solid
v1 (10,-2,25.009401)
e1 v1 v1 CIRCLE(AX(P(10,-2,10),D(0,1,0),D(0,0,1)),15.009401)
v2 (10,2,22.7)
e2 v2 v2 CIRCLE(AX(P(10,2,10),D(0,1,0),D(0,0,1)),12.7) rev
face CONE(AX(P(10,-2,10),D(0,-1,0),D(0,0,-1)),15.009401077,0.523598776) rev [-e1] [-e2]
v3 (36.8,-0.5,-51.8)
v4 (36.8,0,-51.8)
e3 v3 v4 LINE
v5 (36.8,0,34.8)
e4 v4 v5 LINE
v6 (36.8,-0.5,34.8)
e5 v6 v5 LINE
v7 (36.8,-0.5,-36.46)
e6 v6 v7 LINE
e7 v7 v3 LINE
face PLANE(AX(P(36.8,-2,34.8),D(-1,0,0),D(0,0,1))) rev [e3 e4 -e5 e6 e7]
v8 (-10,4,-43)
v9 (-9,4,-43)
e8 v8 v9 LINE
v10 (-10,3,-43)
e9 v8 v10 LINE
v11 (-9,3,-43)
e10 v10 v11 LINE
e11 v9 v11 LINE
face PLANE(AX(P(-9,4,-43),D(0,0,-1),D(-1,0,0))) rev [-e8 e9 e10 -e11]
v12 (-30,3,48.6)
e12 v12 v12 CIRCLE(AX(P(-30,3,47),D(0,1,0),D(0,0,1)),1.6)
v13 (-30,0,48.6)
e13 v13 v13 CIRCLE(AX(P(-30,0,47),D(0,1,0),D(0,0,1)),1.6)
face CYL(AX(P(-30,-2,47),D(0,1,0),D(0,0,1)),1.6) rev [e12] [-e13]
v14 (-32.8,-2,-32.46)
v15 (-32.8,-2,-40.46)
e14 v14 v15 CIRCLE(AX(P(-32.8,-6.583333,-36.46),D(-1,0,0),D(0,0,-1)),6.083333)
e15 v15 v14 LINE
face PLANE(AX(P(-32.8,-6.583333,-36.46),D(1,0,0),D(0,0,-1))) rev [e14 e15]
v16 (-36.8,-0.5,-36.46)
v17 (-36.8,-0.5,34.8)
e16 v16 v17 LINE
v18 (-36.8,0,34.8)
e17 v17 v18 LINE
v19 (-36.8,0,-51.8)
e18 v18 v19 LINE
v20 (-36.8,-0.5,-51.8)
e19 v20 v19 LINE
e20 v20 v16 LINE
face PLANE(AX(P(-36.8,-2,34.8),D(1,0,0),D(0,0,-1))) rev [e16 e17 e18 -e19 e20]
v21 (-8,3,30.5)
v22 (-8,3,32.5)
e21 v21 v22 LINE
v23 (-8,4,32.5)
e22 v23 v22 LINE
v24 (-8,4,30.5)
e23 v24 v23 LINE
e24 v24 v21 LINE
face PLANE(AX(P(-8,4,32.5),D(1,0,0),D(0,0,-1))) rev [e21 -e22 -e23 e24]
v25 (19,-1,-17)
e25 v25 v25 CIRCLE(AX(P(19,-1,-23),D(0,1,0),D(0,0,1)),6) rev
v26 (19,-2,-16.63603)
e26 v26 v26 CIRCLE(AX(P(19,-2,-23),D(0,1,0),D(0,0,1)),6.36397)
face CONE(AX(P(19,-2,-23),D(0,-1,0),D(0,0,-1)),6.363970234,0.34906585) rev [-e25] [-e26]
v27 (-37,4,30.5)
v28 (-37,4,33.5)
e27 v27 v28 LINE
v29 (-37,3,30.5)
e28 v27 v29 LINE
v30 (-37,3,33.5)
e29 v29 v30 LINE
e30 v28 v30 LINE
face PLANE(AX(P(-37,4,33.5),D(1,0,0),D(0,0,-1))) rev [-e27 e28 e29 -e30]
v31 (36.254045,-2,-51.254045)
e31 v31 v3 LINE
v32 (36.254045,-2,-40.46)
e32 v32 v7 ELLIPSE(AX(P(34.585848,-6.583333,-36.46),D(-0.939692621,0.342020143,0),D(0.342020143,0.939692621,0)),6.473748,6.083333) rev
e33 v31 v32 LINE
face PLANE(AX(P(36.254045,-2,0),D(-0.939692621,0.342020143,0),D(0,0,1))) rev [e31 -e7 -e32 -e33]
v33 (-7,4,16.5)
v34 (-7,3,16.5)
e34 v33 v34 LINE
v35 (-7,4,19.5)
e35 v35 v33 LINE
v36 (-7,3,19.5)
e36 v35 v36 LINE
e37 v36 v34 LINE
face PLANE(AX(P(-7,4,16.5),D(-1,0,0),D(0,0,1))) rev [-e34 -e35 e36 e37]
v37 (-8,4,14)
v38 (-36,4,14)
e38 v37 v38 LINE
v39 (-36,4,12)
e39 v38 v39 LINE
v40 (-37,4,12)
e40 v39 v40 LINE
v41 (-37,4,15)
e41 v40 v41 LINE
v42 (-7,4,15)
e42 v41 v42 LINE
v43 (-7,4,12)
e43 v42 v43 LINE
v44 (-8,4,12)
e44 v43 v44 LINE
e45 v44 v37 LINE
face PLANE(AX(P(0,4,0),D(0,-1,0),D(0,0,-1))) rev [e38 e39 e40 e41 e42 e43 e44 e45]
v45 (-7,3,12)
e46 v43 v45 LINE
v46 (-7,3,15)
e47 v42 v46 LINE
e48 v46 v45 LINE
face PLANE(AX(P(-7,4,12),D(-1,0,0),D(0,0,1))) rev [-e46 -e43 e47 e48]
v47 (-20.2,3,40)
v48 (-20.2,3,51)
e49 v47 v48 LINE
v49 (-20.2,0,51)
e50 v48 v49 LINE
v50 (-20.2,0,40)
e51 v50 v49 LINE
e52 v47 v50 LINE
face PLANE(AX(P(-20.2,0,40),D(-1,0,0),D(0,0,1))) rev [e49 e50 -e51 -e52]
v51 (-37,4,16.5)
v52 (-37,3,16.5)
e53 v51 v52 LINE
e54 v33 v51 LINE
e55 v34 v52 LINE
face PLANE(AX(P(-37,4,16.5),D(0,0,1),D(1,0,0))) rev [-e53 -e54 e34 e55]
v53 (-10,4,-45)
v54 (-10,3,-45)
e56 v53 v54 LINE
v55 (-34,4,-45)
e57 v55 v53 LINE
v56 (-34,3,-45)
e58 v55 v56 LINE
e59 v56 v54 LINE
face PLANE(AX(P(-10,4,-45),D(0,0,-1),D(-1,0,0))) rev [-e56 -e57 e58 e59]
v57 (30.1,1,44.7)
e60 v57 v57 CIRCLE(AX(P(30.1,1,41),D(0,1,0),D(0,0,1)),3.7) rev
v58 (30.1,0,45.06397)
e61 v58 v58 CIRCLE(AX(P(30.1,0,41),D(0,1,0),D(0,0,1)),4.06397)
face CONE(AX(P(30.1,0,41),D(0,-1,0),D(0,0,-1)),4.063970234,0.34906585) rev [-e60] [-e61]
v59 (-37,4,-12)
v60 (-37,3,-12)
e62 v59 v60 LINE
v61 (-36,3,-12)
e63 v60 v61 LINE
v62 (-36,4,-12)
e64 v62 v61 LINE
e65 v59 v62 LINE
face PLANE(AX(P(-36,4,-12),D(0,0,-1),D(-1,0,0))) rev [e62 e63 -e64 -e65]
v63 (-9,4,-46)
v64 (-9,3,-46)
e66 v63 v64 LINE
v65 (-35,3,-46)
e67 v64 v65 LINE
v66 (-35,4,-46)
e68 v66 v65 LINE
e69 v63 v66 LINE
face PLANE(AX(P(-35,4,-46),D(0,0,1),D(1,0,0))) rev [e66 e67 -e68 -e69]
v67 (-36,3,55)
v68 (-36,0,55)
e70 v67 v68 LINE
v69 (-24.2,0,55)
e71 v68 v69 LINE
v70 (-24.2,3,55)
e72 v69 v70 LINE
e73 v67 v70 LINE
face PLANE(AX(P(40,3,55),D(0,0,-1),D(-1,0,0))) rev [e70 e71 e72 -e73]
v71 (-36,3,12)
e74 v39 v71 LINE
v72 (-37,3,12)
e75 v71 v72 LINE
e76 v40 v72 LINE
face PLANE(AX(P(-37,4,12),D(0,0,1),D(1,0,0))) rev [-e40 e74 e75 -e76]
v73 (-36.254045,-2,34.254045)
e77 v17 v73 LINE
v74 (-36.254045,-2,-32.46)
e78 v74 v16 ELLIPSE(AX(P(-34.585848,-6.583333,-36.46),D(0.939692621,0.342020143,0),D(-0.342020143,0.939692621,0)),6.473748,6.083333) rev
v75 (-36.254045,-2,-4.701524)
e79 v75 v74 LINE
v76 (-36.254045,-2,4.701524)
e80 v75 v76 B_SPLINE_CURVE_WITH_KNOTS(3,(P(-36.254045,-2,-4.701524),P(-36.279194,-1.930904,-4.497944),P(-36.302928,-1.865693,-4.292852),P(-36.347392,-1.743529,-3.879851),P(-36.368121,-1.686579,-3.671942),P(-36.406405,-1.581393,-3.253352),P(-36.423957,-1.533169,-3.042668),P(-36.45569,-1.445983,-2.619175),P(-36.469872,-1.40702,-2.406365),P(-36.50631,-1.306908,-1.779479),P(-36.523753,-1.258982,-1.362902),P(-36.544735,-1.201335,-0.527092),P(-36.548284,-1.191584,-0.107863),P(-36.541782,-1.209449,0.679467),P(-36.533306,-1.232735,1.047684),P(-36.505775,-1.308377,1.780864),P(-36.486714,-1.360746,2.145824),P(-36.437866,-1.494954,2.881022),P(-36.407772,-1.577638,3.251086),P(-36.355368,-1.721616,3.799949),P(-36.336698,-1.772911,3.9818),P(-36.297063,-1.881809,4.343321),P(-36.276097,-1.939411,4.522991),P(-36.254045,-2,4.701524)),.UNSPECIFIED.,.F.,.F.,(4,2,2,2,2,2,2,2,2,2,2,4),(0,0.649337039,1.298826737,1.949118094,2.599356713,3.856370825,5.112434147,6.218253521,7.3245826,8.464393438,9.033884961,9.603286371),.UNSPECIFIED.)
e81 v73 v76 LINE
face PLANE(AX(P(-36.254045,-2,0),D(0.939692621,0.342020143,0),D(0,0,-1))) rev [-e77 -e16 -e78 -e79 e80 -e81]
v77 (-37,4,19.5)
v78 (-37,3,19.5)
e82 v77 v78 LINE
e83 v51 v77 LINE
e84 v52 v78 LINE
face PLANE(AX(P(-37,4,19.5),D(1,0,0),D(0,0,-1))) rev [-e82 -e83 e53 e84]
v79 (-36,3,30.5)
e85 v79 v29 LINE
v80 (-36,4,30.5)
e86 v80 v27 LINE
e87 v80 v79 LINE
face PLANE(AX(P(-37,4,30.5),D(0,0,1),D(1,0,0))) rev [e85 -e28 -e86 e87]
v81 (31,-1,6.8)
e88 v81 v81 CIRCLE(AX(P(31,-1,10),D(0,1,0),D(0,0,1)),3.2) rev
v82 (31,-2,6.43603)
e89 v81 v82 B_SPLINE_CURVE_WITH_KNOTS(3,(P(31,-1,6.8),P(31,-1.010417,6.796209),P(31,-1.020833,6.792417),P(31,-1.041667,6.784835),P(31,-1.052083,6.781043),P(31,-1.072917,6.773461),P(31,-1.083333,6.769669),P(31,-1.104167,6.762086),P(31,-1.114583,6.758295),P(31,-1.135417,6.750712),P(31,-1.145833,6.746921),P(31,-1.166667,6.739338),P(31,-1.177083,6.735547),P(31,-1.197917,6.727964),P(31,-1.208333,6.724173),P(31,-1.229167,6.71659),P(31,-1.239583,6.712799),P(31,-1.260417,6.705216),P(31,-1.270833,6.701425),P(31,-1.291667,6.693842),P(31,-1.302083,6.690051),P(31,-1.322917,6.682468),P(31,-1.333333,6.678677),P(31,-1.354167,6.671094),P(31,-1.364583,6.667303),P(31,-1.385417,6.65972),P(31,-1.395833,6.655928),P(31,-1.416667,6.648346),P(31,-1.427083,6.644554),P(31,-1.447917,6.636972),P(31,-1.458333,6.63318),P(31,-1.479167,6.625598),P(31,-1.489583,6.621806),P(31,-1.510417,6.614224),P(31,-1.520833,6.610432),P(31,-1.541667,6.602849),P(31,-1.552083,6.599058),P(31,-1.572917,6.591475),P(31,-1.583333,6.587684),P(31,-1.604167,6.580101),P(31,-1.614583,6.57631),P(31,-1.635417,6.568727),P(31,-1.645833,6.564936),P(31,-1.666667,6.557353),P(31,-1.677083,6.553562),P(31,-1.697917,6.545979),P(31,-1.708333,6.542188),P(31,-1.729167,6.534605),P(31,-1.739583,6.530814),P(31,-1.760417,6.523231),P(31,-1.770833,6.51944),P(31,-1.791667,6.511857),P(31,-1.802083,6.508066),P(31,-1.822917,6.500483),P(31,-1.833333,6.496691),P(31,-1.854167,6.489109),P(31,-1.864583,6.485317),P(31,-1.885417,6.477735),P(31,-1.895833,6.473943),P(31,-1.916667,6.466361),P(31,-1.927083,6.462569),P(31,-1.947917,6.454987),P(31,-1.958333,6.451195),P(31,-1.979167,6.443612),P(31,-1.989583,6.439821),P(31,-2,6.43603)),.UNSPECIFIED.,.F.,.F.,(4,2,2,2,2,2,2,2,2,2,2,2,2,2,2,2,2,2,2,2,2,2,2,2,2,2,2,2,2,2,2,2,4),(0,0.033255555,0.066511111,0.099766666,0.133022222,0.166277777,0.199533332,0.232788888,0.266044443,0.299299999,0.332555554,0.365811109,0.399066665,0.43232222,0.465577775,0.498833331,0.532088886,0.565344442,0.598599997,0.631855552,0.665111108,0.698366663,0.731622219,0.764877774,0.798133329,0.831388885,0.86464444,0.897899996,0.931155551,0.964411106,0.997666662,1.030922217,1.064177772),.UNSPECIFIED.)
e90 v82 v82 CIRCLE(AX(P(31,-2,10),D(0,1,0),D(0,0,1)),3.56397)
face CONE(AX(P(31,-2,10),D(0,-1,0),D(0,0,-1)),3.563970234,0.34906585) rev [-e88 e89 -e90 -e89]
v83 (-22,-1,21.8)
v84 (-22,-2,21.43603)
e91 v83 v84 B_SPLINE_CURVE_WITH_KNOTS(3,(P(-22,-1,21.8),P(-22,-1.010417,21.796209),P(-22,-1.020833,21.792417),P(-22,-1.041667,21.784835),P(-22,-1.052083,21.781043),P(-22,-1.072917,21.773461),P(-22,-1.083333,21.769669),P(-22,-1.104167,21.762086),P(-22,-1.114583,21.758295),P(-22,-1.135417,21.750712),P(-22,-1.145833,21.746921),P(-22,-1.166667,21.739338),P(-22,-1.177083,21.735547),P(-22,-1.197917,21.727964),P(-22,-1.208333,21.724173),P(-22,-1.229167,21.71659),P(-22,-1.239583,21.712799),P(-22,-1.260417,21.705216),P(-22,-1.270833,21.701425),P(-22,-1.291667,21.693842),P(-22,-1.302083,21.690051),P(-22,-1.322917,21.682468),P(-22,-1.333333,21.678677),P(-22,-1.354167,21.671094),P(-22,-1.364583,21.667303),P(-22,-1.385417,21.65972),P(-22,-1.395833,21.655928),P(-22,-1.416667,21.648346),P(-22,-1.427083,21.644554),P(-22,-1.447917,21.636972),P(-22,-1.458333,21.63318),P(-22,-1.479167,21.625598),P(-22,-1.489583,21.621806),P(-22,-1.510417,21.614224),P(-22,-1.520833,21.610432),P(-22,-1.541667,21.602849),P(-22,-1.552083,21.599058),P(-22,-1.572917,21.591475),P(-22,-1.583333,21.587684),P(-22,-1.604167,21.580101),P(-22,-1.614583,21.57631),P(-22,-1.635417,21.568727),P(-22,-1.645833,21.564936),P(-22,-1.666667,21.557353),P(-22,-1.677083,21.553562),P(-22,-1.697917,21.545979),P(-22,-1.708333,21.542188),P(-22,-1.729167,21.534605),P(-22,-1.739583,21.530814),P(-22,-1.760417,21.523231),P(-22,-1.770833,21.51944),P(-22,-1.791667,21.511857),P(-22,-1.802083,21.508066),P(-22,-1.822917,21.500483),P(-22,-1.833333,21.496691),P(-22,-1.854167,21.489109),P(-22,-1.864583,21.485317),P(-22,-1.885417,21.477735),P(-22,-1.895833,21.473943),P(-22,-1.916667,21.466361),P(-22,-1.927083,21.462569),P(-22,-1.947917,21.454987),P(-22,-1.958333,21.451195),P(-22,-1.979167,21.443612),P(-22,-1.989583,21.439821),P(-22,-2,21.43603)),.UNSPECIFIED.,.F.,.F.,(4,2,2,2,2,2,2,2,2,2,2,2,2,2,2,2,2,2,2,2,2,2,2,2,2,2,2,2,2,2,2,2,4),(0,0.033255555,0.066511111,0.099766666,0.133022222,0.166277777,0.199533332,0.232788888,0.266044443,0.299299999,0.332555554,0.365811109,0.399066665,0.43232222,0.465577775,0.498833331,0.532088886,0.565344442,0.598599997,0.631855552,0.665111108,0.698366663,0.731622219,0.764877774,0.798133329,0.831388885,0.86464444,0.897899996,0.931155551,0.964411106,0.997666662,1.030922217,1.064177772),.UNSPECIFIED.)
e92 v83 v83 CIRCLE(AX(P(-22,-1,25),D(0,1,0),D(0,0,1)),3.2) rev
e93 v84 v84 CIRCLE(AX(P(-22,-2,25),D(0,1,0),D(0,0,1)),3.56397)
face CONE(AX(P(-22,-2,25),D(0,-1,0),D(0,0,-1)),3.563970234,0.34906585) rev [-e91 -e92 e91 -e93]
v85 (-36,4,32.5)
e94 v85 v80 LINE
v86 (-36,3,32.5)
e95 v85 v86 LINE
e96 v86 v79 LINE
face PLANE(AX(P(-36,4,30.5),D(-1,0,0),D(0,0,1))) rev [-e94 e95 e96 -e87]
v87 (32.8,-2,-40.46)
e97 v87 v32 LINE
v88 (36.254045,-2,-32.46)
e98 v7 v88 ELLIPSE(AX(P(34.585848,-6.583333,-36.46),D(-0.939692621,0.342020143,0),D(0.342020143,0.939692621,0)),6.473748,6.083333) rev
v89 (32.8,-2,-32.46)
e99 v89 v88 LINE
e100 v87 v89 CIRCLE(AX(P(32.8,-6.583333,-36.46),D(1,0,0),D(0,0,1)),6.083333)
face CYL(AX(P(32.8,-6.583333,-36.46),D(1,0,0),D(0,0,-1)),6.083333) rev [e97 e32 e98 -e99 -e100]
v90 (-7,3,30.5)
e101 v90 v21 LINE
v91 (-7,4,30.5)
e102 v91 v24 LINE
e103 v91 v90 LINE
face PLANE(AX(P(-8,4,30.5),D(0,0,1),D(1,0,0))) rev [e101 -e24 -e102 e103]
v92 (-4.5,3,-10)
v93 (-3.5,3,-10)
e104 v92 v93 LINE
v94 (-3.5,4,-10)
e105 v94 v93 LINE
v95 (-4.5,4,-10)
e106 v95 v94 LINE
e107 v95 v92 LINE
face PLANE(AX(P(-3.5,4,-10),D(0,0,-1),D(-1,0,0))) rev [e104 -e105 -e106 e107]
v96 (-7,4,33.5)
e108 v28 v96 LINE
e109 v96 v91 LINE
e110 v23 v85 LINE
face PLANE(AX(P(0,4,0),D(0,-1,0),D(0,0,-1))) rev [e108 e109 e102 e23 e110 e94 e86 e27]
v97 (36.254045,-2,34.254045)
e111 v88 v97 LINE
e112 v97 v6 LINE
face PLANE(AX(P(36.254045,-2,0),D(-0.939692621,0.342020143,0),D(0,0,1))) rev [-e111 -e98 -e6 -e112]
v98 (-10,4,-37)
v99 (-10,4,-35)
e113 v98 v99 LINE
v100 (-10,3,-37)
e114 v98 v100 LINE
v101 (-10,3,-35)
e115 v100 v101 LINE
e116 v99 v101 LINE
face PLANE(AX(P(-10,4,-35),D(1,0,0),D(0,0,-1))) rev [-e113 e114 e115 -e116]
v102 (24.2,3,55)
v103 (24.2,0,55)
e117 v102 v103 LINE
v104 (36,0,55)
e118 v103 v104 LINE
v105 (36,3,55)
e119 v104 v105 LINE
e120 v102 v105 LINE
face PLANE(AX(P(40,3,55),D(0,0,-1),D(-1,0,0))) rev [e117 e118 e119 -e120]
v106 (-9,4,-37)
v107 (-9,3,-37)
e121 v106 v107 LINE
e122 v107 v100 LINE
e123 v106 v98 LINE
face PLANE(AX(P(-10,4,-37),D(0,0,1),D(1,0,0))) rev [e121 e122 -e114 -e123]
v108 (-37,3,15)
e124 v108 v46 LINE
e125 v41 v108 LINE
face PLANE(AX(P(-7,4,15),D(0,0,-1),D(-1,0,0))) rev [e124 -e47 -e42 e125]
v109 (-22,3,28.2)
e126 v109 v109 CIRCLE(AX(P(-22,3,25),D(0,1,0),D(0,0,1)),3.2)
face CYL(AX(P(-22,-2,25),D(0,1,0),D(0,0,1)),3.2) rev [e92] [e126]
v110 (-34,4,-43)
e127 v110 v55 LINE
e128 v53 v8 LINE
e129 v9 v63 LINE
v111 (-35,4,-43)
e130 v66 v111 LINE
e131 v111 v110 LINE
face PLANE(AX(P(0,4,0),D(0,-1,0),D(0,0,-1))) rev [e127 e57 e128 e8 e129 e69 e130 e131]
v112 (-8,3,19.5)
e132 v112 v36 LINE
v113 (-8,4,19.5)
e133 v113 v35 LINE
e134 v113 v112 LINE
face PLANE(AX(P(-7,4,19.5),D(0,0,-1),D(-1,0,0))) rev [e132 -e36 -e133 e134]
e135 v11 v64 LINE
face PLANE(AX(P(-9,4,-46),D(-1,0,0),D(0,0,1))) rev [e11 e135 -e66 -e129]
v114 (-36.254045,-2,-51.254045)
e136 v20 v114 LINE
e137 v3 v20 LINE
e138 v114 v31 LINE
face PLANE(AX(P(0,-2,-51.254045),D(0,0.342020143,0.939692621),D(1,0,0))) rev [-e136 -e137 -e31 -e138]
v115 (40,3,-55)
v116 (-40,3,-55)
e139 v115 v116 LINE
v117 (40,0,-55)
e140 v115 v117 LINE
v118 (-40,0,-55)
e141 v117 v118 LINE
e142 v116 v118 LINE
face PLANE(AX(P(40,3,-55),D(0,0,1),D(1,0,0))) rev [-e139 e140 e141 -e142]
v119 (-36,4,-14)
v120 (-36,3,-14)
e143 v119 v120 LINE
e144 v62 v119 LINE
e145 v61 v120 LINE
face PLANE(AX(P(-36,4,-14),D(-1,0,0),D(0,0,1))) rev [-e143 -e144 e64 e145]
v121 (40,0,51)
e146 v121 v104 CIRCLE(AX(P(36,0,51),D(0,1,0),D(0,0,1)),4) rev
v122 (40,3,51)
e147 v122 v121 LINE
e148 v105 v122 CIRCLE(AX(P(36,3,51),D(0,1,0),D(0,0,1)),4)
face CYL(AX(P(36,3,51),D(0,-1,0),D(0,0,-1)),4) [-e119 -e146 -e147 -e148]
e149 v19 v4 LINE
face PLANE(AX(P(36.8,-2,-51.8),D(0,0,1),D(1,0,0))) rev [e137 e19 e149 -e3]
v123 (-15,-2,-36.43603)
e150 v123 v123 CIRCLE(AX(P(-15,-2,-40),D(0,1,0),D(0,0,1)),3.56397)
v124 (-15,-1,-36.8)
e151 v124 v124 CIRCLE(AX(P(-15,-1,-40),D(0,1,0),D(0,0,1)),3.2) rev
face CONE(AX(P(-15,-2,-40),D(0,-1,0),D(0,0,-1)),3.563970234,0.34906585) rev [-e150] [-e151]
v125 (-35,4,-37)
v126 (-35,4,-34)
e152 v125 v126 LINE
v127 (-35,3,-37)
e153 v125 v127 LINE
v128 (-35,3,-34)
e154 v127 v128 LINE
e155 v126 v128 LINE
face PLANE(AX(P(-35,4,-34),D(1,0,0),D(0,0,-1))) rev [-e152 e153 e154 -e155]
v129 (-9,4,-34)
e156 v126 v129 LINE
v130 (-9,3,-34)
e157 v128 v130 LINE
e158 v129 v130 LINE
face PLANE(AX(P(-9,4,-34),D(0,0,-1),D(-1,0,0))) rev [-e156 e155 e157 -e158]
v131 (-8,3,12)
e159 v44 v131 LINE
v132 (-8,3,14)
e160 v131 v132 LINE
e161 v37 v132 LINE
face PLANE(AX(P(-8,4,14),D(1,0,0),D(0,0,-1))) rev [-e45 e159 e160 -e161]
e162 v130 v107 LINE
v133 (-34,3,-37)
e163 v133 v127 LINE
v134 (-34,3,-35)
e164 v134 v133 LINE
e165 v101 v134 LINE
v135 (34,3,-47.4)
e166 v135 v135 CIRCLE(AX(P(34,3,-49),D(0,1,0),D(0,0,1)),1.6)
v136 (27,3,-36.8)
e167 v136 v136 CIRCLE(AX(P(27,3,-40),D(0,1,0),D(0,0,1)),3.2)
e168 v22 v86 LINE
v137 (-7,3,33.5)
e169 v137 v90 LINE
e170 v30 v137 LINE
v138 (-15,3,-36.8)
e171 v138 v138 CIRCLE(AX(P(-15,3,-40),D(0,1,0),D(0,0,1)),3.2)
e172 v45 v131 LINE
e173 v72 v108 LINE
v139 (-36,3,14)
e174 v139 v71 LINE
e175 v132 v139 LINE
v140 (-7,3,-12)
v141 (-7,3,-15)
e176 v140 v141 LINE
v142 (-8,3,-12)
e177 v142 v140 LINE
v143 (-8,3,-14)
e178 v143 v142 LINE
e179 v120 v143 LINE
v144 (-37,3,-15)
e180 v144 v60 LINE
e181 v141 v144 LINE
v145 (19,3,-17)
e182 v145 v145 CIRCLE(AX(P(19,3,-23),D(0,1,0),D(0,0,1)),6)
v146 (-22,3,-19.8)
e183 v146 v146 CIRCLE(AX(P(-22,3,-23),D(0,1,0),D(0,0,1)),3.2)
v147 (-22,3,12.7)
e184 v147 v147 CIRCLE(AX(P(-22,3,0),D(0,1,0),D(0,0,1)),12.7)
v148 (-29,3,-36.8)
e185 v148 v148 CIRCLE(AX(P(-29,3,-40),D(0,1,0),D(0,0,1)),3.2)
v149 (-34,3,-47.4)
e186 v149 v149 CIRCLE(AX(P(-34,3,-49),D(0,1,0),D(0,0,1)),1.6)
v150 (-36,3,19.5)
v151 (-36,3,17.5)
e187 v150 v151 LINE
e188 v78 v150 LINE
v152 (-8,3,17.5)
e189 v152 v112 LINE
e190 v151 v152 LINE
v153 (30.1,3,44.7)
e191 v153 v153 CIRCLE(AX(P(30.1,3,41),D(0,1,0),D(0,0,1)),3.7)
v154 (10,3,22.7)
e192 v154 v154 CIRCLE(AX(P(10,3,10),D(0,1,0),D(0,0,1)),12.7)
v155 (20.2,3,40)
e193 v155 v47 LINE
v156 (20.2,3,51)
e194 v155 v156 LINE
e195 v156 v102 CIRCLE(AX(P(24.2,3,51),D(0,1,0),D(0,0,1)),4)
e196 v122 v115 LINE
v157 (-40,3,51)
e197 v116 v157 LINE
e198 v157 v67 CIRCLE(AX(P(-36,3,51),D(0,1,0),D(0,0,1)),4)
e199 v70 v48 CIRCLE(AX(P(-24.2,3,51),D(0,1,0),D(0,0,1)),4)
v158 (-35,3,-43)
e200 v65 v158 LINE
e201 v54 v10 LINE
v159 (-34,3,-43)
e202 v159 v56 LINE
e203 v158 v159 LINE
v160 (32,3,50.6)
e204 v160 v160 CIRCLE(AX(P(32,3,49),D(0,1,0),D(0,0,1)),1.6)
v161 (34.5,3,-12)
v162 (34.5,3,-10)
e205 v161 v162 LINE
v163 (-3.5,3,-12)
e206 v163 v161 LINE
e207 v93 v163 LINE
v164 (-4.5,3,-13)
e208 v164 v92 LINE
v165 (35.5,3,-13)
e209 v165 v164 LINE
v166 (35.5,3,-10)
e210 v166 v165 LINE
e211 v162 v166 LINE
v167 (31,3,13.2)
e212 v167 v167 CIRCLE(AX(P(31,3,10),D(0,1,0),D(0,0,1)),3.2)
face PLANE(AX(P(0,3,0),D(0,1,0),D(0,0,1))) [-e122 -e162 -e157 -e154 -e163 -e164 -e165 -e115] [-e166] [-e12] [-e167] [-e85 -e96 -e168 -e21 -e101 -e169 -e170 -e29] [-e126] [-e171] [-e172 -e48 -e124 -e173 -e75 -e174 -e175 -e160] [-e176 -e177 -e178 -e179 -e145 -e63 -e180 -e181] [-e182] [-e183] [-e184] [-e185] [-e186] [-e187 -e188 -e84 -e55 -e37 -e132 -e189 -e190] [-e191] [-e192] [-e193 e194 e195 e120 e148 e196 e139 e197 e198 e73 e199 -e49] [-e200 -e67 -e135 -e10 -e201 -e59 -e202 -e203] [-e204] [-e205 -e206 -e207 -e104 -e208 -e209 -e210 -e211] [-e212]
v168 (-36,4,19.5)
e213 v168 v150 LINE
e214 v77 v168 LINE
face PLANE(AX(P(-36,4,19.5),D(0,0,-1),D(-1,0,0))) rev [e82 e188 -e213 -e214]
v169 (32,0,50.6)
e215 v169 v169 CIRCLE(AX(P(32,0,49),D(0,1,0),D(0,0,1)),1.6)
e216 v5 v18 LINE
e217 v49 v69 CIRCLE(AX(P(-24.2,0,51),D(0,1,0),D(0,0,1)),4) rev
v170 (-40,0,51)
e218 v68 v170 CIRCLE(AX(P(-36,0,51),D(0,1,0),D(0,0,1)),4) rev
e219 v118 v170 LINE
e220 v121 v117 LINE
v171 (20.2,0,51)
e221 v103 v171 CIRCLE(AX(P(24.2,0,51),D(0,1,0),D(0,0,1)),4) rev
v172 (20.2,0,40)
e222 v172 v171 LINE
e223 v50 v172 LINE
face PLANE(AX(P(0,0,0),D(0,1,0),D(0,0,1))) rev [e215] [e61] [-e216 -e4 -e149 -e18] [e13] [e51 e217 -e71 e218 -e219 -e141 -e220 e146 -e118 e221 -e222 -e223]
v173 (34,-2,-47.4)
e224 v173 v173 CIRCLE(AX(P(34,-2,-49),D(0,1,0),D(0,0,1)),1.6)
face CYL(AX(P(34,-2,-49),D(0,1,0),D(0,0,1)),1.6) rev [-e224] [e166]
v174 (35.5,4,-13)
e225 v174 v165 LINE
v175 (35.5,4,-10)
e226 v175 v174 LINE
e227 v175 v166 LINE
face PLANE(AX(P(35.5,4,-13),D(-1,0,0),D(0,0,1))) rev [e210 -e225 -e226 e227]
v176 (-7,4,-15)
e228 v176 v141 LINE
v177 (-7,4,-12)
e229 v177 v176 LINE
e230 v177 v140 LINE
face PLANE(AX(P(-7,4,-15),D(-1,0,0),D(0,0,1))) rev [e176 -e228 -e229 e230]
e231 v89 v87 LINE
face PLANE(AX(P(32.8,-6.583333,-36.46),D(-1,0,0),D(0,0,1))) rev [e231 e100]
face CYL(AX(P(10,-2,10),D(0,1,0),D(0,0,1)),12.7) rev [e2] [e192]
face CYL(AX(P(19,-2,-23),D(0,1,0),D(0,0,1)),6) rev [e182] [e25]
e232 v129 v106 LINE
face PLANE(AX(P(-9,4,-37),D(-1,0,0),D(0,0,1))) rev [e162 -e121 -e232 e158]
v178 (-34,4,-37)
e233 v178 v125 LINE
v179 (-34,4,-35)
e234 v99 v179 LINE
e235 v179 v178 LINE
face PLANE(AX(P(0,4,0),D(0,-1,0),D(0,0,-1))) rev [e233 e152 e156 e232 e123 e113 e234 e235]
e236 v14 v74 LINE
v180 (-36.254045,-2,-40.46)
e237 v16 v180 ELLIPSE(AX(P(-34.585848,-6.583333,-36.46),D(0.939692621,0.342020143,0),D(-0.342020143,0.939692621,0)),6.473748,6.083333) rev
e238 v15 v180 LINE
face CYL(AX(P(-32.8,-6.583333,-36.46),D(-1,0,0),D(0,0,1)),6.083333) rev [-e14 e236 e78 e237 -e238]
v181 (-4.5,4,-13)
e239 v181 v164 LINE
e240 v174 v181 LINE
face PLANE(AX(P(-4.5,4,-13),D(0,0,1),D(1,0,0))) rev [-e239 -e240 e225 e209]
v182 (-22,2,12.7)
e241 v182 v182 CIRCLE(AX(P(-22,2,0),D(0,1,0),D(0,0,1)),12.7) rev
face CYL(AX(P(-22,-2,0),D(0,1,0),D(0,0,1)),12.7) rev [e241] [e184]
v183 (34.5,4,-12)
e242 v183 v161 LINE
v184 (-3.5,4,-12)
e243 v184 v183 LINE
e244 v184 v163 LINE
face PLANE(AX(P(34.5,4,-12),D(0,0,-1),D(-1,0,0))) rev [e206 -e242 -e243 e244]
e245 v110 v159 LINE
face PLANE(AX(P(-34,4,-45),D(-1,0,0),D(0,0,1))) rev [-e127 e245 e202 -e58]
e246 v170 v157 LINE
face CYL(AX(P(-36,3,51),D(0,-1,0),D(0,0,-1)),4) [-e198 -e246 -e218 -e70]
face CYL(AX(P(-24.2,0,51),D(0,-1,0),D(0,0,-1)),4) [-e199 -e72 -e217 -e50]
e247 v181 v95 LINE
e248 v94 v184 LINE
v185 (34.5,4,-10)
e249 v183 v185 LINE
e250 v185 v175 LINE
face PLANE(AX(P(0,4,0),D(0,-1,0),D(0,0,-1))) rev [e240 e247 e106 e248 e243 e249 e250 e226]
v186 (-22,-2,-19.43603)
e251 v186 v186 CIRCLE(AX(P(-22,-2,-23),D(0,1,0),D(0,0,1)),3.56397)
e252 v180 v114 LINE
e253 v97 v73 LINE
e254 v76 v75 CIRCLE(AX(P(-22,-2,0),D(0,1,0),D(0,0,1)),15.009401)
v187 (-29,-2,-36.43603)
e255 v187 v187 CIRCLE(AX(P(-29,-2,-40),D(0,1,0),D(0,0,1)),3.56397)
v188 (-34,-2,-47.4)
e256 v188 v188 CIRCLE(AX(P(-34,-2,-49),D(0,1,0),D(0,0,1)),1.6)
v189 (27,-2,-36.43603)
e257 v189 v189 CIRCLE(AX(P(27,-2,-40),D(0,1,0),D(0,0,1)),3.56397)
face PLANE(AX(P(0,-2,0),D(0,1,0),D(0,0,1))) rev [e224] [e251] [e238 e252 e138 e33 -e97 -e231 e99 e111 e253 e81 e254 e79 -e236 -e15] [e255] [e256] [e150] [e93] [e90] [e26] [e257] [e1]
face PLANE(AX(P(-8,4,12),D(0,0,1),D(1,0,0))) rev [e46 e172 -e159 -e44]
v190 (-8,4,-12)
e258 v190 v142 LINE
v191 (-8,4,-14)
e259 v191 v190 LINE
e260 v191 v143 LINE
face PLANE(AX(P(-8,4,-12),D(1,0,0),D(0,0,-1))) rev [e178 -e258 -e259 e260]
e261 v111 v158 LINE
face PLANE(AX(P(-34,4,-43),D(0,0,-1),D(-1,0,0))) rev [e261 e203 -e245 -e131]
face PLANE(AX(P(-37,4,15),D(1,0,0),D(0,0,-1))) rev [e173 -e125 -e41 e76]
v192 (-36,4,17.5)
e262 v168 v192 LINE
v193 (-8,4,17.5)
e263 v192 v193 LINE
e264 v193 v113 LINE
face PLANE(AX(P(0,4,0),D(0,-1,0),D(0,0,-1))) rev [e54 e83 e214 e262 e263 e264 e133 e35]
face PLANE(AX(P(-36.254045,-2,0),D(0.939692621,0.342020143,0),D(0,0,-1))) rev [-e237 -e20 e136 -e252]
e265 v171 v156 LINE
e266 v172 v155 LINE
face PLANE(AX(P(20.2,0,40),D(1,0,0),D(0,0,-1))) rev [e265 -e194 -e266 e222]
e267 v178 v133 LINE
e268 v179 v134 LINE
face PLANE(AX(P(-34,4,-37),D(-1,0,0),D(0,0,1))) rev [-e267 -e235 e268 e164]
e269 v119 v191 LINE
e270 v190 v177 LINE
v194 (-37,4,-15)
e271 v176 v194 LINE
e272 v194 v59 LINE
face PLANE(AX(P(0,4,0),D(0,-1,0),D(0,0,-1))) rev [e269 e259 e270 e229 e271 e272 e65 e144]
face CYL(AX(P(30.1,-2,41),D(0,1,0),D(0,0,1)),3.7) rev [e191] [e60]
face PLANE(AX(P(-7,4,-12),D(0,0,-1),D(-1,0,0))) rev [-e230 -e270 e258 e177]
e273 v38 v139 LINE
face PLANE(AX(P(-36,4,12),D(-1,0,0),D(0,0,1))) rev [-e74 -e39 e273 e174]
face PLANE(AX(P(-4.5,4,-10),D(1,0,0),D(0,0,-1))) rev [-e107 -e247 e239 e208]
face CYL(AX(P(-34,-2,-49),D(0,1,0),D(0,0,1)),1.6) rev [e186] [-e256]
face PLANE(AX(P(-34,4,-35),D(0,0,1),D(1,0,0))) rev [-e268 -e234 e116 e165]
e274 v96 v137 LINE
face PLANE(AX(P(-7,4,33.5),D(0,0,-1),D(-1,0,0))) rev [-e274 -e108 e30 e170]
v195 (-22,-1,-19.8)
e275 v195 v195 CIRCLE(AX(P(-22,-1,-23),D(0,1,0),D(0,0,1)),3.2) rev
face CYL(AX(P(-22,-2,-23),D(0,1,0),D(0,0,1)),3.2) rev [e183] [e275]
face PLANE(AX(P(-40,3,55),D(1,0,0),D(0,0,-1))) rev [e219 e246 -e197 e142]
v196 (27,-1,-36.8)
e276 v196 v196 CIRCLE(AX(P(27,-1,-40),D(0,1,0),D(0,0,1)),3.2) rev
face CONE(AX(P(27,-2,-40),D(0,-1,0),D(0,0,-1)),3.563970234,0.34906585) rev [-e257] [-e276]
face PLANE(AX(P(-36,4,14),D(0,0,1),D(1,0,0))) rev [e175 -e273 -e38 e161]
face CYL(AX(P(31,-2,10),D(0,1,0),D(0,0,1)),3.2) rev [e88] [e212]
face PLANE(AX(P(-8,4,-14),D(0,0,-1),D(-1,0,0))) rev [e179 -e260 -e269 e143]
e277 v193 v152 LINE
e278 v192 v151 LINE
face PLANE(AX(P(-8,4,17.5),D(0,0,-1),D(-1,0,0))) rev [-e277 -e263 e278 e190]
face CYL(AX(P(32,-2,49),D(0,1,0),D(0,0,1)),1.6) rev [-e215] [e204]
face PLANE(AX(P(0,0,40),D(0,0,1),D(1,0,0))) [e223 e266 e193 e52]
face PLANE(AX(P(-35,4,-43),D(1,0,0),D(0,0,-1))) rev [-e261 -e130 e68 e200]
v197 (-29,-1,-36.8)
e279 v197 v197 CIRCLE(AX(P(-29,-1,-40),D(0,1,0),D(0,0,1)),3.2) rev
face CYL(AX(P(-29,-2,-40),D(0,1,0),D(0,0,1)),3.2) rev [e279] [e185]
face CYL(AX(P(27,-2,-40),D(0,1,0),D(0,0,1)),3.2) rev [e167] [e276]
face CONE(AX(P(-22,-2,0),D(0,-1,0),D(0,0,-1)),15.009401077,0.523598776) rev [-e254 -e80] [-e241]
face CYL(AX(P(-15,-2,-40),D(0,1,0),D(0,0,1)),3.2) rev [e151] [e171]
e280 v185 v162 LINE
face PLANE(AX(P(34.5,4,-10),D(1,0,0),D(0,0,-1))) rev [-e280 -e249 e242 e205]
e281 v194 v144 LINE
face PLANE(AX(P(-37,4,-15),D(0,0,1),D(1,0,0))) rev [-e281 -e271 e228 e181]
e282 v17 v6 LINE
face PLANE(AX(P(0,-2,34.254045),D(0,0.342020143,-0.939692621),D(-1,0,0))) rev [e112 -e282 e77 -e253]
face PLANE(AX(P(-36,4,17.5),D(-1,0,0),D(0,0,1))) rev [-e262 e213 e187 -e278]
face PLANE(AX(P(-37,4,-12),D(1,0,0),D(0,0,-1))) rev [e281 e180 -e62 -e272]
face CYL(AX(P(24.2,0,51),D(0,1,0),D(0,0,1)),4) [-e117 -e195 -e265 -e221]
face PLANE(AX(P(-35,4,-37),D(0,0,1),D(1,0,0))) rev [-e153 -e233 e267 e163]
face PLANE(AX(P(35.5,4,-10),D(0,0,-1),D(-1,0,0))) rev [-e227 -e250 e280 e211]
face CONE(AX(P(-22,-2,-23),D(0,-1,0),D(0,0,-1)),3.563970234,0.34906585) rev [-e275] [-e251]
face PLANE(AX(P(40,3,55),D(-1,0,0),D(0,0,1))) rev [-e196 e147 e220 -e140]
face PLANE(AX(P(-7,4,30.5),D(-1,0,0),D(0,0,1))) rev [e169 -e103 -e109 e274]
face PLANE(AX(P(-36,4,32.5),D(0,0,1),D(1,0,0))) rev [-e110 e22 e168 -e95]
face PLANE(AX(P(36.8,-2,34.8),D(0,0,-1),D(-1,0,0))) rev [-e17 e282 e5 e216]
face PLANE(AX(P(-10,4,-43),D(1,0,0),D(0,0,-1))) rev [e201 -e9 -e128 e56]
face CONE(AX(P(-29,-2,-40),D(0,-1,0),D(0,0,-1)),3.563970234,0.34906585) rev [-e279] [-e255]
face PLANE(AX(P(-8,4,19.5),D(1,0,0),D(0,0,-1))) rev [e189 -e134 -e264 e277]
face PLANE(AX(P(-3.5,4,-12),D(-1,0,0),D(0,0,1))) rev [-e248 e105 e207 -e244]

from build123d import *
from OCP.BRepFilletAPI import BRepFilletAPI_MakeChamfer

# Parameters (mm, degrees)
SKETCH1_W           = 80
SKETCH1_H           = 110
BOSS_EXTRUDE1_DEPTH = 3
SKETCH2_W           = 40.4
SKETCH2_H           = 3
CUT_EXTRUDE1_DEPTH  = 15
FILLET1_R           = 4
SKETCH7_W           = 73.6
SKETCH7_H           = 86.6
BOSS_EXTRUDE2_DEPTH = 2
SKETCH3_R           = 12.7
CUT_EXTRUDE2_DEPTH  = 69.190908485
SKETCH4_R           = 6
SKETCH4_R_2         = 3.2
SKETCH4_R_3         = 3.7
SKETCH4_R_4         = 1.6
CUT_EXTRUDE3_DEPTH  = 69.190908485
CHAMFER2_SIZE       = 1.5
CHAMFER2_SIZE2      = 0.545955351
CHAMFER3_SIZE       = 2.309401077
CHAMFER3_SIZE_2     = 4
BOSS_EXTRUDE3_DEPTH = 1
CHAMFER4_SIZE       = 1
CHAMFER4_SIZE2      = 0.363970234
CUT_EXTRUDE4_DEPTH  = 4
CUT_EXTRUDE5_START  = -4
CUT_EXTRUDE5_DEPTH  = 4


with BuildPart() as part:
    # Sketch1 → Boss-Extrude1 (new body)
    with BuildSketch(Plane(origin=(0, 0, 0), x_dir=(1, 0, 0), z_dir=(0, 1, 0))):
        Rectangle(SKETCH1_W, SKETCH1_H)
    extrude(amount=BOSS_EXTRUDE1_DEPTH)

    # Sketch2 → Cut-Extrude1 (cut)
    with BuildSketch(Plane.XY.offset(55)):
        with Locations((0, 1.5)):
            Rectangle(SKETCH2_W, SKETCH2_H)
    extrude(amount=-CUT_EXTRUDE1_DEPTH, mode=Mode.SUBTRACT)

    # Fillet1
    fillet1_edges = [part.edges().sort_by_distance(p)[0] for p in [
        (-20.2, 1.5, 55),
        (20.2, 1.5, 55),
        (40, 1.5, 55),
        (-40, 1.5, 55),
    ]]
    fillet(fillet1_edges, radius=FILLET1_R)

    # Sketch7 → Boss-Extrude2 (add)
    with BuildSketch(Plane.XZ):
        with Locations((0, -8.5)):
            Rectangle(SKETCH7_W, SKETCH7_H)
    extrude(amount=BOSS_EXTRUDE2_DEPTH)

    # Sketch3 → Cut-Extrude2 (cut, through all)
    with BuildSketch(Plane(origin=(0, 3, 0), x_dir=(1, 0, 0), z_dir=(0, 1, 0))):
        with Locations(Location((-22, 0, 0), (0, 0, 270))):
            Circle(SKETCH3_R)
        with Locations(Location((10, -10, 0), (0, 0, 270))):
            Circle(SKETCH3_R)
    extrude(amount=-CUT_EXTRUDE2_DEPTH, mode=Mode.SUBTRACT)

    # Sketch4 → Cut-Extrude3 (cut, through all)
    with BuildSketch(Plane(origin=(0, 3, 0), x_dir=(1, 0, 0), z_dir=(0, 1, 0))):
        with Locations(Location((19, 23, 0), (0, 0, 270))):
            Circle(SKETCH4_R)
        with Locations(Location((-22, 23, 0), (0, 0, 270))):
            Circle(SKETCH4_R_2)
        with Locations(Location((31, -10, 0), (0, 0, 270))):
            Circle(SKETCH4_R_2)
        with Locations(Location((30.1, -41, 0), (0, 0, 270))):
            Circle(SKETCH4_R_3)
        with Locations(Location((-29, 40, 0), (0, 0, 270))):
            Circle(SKETCH4_R_2)
        with Locations(Location((-15, 40, 0), (0, 0, 270))):
            Circle(SKETCH4_R_2)
        with Locations(Location((27, 40, 0), (0, 0, 270))):
            Circle(SKETCH4_R_2)
        with Locations(Location((-22, -25, 0), (0, 0, 270))):
            Circle(SKETCH4_R_2)
        with Locations(Location((-30, -47, 0), (0, 0, 270))):
            Circle(SKETCH4_R_4)
        with Locations(Location((-34, 49, 0), (0, 0, 270))):
            Circle(SKETCH4_R_4)
        with Locations(Location((34, 49, 0), (0, 0, 270))):
            Circle(SKETCH4_R_4)
        with Locations(Location((32, -49, 0), (0, 0, 270))):
            Circle(SKETCH4_R_4)
    extrude(amount=-CUT_EXTRUDE3_DEPTH, mode=Mode.SUBTRACT)

    # Chamfer2: one chamfer whose edges measure the first distance from different faces: ONE call of the kernel's chamfer builder (chamfer() names one face for all edges)
    chamfer2_edges_1 = [part.edges().sort_by_distance(p)[0] for p in [
        (-36.8, -2, -8.5),
    ]]
    chamfer2_side_1 = [part.faces().sort_by_distance(p)[0] for p in [
        (-36.8, -1, -8.5),
    ]]
    chamfer2_edges_2 = [part.edges().sort_by_distance(p)[0] for p in [
        (0, -2, -51.8),
    ]]
    chamfer2_side_2 = [part.faces().sort_by_distance(p)[0] for p in [
        (0, -1, -51.8),
    ]]
    chamfer2_edges_3 = [part.edges().sort_by_distance(p)[0] for p in [
        (36.8, -2, -8.5),
    ]]
    chamfer2_side_3 = [part.faces().sort_by_distance(p)[0] for p in [
        (36.8, -1, -8.5),
    ]]
    chamfer2_edges_4 = [part.edges().sort_by_distance(p)[0] for p in [
        (0, -2, 34.8),
    ]]
    chamfer2_side_4 = [part.faces().sort_by_distance(p)[0] for p in [
        (0, -1, 34.8),
    ]]
    chamfer2 = BRepFilletAPI_MakeChamfer(part.part.solid().wrapped)
    for e in chamfer2_edges_1:
        chamfer2.Add(CHAMFER2_SIZE, CHAMFER2_SIZE2, e.wrapped, chamfer2_side_1[0].wrapped)  # the first distance lies on this face
    for e in chamfer2_edges_2:
        chamfer2.Add(CHAMFER2_SIZE, CHAMFER2_SIZE2, e.wrapped, chamfer2_side_2[0].wrapped)  # the first distance lies on this face
    for e in chamfer2_edges_3:
        chamfer2.Add(CHAMFER2_SIZE, CHAMFER2_SIZE2, e.wrapped, chamfer2_side_3[0].wrapped)  # the first distance lies on this face
    for e in chamfer2_edges_4:
        chamfer2.Add(CHAMFER2_SIZE, CHAMFER2_SIZE2, e.wrapped, chamfer2_side_4[0].wrapped)  # the first distance lies on this face
    add(Compound.cast(chamfer2.Shape()), mode=Mode.REPLACE)

    # Chamfer3
    # the kernel refuses this chamfer: 4, 2.309401077 mm, written as the material it takes off along each edge
    with BuildSketch(Plane(origin=(-22, -2, 0), x_dir=(0, 0, 1), z_dir=(-1, 0, 0))) as chamfer3_piece_1:
        Polygon((12.7 + CHAMFER3_SIZE, 0), (12.7, CHAMFER3_SIZE_2), (12.7, 0), align=None)
    revolve(axis=Axis((-22, -2, 0), (0, 1, 0)), mode=Mode.SUBTRACT)
    with BuildSketch(Plane(origin=(10, -2, 10), x_dir=(0, 0, 1), z_dir=(-1, 0, 0))) as chamfer3_piece_2:
        Polygon((12.7 + CHAMFER3_SIZE, 0), (12.7, CHAMFER3_SIZE_2), (12.7, 0), align=None)
    revolve(axis=Axis((10, -2, 10), (0, 1, 0)), mode=Mode.SUBTRACT)

    # Sketch8 → Boss-Extrude3 (add)
    with BuildSketch(Plane(origin=(0, 3, 0), x_dir=(1, 0, 0), z_dir=(0, 1, 0))):
        Polygon((-35, 43), (-35, 46), (-9, 46), (-9, 43), (-10, 43), (-10, 45), (-34, 45), (-34, 43), align=None)
        Polygon((-9, 37), (-9, 34), (-35, 34), (-35, 37), (-34, 37), (-34, 35), (-10, 35), (-10, 37), align=None)
        Polygon((-37, 12), (-37, 15), (-7, 15), (-7, 12), (-8, 12), (-8, 14), (-36, 14), (-36, 12), align=None)
        Polygon((-4.5, 10), (-4.5, 13), (35.5, 13), (35.5, 10), (34.5, 10), (34.5, 12), (-3.5, 12), (-3.5, 10), align=None)
        Polygon((-7, -12), (-7, -15), (-37, -15), (-37, -12), (-36, -12), (-36, -14), (-8, -14), (-8, -12), align=None)
        Polygon((-37, -19.5), (-37, -16.5), (-7, -16.5), (-7, -19.5), (-8, -19.5), (-8, -17.5), (-36, -17.5), (-36, -19.5), align=None)
        Polygon((-7, -30.5), (-7, -33.5), (-37, -33.5), (-37, -30.5), (-36, -30.5), (-36, -32.5), (-8, -32.5), (-8, -30.5), align=None)
    extrude(amount=BOSS_EXTRUDE3_DEPTH)

    # Chamfer4: one chamfer whose edges measure the first distance from different faces: ONE call of the kernel's chamfer builder (chamfer() names one face for all edges)
    chamfer4_edges_1 = [part.edges().sort_by_distance(p)[0] for p in [
        (-22, -2, 21.8),
    ]]
    chamfer4_side_1 = [part.faces().sort_by_distance(p)[0] for p in [
        (-22, 0.5, 21.8),
    ]]
    chamfer4_edges_2 = [part.edges().sort_by_distance(p)[0] for p in [
        (-22, -2, -26.2),
    ]]
    chamfer4_side_2 = [part.faces().sort_by_distance(p)[0] for p in [
        (-22, 0.5, -26.2),
    ]]
    chamfer4_edges_3 = [part.edges().sort_by_distance(p)[0] for p in [
        (31, -2, 6.8),
    ]]
    chamfer4_side_3 = [part.faces().sort_by_distance(p)[0] for p in [
        (31, 0.5, 6.8),
    ]]
    chamfer4_edges_4 = [part.edges().sort_by_distance(p)[0] for p in [
        (30.1, 0, 37.3),
    ]]
    chamfer4_side_4 = [part.faces().sort_by_distance(p)[0] for p in [
        (30.1, 1.5, 37.3),
    ]]
    chamfer4_edges_5 = [part.edges().sort_by_distance(p)[0] for p in [
        (-29, -2, -43.2),
    ]]
    chamfer4_side_5 = [part.faces().sort_by_distance(p)[0] for p in [
        (-29, 0.5, -43.2),
    ]]
    chamfer4_edges_6 = [part.edges().sort_by_distance(p)[0] for p in [
        (-15, -2, -43.2),
    ]]
    chamfer4_side_6 = [part.faces().sort_by_distance(p)[0] for p in [
        (-15, 0.5, -43.2),
    ]]
    chamfer4_edges_7 = [part.edges().sort_by_distance(p)[0] for p in [
        (19, -2, -29),
    ]]
    chamfer4_side_7 = [part.faces().sort_by_distance(p)[0] for p in [
        (19, 0.5, -29),
    ]]
    chamfer4_edges_8 = [part.edges().sort_by_distance(p)[0] for p in [
        (27, -2, -43.2),
    ]]
    chamfer4_side_8 = [part.faces().sort_by_distance(p)[0] for p in [
        (27, 0.5, -43.2),
    ]]
    chamfer4 = BRepFilletAPI_MakeChamfer(part.part.solid().wrapped)
    for e in chamfer4_edges_1:
        chamfer4.Add(CHAMFER4_SIZE, CHAMFER4_SIZE2, e.wrapped, chamfer4_side_1[0].wrapped)  # the first distance lies on this face
    for e in chamfer4_edges_2:
        chamfer4.Add(CHAMFER4_SIZE, CHAMFER4_SIZE2, e.wrapped, chamfer4_side_2[0].wrapped)  # the first distance lies on this face
    for e in chamfer4_edges_3:
        chamfer4.Add(CHAMFER4_SIZE, CHAMFER4_SIZE2, e.wrapped, chamfer4_side_3[0].wrapped)  # the first distance lies on this face
    for e in chamfer4_edges_4:
        chamfer4.Add(CHAMFER4_SIZE, CHAMFER4_SIZE2, e.wrapped, chamfer4_side_4[0].wrapped)  # the first distance lies on this face
    for e in chamfer4_edges_5:
        chamfer4.Add(CHAMFER4_SIZE, CHAMFER4_SIZE2, e.wrapped, chamfer4_side_5[0].wrapped)  # the first distance lies on this face
    for e in chamfer4_edges_6:
        chamfer4.Add(CHAMFER4_SIZE, CHAMFER4_SIZE2, e.wrapped, chamfer4_side_6[0].wrapped)  # the first distance lies on this face
    for e in chamfer4_edges_7:
        chamfer4.Add(CHAMFER4_SIZE, CHAMFER4_SIZE2, e.wrapped, chamfer4_side_7[0].wrapped)  # the first distance lies on this face
    for e in chamfer4_edges_8:
        chamfer4.Add(CHAMFER4_SIZE, CHAMFER4_SIZE2, e.wrapped, chamfer4_side_8[0].wrapped)  # the first distance lies on this face
    add(Compound.cast(chamfer4.Shape()), mode=Mode.REPLACE)

    # Sketch9 → Cut-Extrude4 (cut)
    with BuildSketch(Plane(origin=(36.8, 0, 0), x_dir=(0, 0, -1), z_dir=(1, 0, 0))):
        with BuildLine():
            Line((40.46, -2), (32.46, -2))
            ThreePointArc((32.46, -2), (36.46, -0.5), (40.46, -2))
        make_face()
    extrude(amount=-CUT_EXTRUDE4_DEPTH, mode=Mode.SUBTRACT)

    # Sketch10 → Cut-Extrude5 (cut)
    with BuildSketch(Plane.ZY.offset(36.8).offset(CUT_EXTRUDE5_START)):
        with BuildLine():
            Line((-40.46, -2), (-32.46, -2))
            ThreePointArc((-32.46, -2), (-36.46, -0.5), (-40.46, -2))
        make_face()
    extrude(amount=CUT_EXTRUDE5_DEPTH, mode=Mode.SUBTRACT)


solid = part.part
